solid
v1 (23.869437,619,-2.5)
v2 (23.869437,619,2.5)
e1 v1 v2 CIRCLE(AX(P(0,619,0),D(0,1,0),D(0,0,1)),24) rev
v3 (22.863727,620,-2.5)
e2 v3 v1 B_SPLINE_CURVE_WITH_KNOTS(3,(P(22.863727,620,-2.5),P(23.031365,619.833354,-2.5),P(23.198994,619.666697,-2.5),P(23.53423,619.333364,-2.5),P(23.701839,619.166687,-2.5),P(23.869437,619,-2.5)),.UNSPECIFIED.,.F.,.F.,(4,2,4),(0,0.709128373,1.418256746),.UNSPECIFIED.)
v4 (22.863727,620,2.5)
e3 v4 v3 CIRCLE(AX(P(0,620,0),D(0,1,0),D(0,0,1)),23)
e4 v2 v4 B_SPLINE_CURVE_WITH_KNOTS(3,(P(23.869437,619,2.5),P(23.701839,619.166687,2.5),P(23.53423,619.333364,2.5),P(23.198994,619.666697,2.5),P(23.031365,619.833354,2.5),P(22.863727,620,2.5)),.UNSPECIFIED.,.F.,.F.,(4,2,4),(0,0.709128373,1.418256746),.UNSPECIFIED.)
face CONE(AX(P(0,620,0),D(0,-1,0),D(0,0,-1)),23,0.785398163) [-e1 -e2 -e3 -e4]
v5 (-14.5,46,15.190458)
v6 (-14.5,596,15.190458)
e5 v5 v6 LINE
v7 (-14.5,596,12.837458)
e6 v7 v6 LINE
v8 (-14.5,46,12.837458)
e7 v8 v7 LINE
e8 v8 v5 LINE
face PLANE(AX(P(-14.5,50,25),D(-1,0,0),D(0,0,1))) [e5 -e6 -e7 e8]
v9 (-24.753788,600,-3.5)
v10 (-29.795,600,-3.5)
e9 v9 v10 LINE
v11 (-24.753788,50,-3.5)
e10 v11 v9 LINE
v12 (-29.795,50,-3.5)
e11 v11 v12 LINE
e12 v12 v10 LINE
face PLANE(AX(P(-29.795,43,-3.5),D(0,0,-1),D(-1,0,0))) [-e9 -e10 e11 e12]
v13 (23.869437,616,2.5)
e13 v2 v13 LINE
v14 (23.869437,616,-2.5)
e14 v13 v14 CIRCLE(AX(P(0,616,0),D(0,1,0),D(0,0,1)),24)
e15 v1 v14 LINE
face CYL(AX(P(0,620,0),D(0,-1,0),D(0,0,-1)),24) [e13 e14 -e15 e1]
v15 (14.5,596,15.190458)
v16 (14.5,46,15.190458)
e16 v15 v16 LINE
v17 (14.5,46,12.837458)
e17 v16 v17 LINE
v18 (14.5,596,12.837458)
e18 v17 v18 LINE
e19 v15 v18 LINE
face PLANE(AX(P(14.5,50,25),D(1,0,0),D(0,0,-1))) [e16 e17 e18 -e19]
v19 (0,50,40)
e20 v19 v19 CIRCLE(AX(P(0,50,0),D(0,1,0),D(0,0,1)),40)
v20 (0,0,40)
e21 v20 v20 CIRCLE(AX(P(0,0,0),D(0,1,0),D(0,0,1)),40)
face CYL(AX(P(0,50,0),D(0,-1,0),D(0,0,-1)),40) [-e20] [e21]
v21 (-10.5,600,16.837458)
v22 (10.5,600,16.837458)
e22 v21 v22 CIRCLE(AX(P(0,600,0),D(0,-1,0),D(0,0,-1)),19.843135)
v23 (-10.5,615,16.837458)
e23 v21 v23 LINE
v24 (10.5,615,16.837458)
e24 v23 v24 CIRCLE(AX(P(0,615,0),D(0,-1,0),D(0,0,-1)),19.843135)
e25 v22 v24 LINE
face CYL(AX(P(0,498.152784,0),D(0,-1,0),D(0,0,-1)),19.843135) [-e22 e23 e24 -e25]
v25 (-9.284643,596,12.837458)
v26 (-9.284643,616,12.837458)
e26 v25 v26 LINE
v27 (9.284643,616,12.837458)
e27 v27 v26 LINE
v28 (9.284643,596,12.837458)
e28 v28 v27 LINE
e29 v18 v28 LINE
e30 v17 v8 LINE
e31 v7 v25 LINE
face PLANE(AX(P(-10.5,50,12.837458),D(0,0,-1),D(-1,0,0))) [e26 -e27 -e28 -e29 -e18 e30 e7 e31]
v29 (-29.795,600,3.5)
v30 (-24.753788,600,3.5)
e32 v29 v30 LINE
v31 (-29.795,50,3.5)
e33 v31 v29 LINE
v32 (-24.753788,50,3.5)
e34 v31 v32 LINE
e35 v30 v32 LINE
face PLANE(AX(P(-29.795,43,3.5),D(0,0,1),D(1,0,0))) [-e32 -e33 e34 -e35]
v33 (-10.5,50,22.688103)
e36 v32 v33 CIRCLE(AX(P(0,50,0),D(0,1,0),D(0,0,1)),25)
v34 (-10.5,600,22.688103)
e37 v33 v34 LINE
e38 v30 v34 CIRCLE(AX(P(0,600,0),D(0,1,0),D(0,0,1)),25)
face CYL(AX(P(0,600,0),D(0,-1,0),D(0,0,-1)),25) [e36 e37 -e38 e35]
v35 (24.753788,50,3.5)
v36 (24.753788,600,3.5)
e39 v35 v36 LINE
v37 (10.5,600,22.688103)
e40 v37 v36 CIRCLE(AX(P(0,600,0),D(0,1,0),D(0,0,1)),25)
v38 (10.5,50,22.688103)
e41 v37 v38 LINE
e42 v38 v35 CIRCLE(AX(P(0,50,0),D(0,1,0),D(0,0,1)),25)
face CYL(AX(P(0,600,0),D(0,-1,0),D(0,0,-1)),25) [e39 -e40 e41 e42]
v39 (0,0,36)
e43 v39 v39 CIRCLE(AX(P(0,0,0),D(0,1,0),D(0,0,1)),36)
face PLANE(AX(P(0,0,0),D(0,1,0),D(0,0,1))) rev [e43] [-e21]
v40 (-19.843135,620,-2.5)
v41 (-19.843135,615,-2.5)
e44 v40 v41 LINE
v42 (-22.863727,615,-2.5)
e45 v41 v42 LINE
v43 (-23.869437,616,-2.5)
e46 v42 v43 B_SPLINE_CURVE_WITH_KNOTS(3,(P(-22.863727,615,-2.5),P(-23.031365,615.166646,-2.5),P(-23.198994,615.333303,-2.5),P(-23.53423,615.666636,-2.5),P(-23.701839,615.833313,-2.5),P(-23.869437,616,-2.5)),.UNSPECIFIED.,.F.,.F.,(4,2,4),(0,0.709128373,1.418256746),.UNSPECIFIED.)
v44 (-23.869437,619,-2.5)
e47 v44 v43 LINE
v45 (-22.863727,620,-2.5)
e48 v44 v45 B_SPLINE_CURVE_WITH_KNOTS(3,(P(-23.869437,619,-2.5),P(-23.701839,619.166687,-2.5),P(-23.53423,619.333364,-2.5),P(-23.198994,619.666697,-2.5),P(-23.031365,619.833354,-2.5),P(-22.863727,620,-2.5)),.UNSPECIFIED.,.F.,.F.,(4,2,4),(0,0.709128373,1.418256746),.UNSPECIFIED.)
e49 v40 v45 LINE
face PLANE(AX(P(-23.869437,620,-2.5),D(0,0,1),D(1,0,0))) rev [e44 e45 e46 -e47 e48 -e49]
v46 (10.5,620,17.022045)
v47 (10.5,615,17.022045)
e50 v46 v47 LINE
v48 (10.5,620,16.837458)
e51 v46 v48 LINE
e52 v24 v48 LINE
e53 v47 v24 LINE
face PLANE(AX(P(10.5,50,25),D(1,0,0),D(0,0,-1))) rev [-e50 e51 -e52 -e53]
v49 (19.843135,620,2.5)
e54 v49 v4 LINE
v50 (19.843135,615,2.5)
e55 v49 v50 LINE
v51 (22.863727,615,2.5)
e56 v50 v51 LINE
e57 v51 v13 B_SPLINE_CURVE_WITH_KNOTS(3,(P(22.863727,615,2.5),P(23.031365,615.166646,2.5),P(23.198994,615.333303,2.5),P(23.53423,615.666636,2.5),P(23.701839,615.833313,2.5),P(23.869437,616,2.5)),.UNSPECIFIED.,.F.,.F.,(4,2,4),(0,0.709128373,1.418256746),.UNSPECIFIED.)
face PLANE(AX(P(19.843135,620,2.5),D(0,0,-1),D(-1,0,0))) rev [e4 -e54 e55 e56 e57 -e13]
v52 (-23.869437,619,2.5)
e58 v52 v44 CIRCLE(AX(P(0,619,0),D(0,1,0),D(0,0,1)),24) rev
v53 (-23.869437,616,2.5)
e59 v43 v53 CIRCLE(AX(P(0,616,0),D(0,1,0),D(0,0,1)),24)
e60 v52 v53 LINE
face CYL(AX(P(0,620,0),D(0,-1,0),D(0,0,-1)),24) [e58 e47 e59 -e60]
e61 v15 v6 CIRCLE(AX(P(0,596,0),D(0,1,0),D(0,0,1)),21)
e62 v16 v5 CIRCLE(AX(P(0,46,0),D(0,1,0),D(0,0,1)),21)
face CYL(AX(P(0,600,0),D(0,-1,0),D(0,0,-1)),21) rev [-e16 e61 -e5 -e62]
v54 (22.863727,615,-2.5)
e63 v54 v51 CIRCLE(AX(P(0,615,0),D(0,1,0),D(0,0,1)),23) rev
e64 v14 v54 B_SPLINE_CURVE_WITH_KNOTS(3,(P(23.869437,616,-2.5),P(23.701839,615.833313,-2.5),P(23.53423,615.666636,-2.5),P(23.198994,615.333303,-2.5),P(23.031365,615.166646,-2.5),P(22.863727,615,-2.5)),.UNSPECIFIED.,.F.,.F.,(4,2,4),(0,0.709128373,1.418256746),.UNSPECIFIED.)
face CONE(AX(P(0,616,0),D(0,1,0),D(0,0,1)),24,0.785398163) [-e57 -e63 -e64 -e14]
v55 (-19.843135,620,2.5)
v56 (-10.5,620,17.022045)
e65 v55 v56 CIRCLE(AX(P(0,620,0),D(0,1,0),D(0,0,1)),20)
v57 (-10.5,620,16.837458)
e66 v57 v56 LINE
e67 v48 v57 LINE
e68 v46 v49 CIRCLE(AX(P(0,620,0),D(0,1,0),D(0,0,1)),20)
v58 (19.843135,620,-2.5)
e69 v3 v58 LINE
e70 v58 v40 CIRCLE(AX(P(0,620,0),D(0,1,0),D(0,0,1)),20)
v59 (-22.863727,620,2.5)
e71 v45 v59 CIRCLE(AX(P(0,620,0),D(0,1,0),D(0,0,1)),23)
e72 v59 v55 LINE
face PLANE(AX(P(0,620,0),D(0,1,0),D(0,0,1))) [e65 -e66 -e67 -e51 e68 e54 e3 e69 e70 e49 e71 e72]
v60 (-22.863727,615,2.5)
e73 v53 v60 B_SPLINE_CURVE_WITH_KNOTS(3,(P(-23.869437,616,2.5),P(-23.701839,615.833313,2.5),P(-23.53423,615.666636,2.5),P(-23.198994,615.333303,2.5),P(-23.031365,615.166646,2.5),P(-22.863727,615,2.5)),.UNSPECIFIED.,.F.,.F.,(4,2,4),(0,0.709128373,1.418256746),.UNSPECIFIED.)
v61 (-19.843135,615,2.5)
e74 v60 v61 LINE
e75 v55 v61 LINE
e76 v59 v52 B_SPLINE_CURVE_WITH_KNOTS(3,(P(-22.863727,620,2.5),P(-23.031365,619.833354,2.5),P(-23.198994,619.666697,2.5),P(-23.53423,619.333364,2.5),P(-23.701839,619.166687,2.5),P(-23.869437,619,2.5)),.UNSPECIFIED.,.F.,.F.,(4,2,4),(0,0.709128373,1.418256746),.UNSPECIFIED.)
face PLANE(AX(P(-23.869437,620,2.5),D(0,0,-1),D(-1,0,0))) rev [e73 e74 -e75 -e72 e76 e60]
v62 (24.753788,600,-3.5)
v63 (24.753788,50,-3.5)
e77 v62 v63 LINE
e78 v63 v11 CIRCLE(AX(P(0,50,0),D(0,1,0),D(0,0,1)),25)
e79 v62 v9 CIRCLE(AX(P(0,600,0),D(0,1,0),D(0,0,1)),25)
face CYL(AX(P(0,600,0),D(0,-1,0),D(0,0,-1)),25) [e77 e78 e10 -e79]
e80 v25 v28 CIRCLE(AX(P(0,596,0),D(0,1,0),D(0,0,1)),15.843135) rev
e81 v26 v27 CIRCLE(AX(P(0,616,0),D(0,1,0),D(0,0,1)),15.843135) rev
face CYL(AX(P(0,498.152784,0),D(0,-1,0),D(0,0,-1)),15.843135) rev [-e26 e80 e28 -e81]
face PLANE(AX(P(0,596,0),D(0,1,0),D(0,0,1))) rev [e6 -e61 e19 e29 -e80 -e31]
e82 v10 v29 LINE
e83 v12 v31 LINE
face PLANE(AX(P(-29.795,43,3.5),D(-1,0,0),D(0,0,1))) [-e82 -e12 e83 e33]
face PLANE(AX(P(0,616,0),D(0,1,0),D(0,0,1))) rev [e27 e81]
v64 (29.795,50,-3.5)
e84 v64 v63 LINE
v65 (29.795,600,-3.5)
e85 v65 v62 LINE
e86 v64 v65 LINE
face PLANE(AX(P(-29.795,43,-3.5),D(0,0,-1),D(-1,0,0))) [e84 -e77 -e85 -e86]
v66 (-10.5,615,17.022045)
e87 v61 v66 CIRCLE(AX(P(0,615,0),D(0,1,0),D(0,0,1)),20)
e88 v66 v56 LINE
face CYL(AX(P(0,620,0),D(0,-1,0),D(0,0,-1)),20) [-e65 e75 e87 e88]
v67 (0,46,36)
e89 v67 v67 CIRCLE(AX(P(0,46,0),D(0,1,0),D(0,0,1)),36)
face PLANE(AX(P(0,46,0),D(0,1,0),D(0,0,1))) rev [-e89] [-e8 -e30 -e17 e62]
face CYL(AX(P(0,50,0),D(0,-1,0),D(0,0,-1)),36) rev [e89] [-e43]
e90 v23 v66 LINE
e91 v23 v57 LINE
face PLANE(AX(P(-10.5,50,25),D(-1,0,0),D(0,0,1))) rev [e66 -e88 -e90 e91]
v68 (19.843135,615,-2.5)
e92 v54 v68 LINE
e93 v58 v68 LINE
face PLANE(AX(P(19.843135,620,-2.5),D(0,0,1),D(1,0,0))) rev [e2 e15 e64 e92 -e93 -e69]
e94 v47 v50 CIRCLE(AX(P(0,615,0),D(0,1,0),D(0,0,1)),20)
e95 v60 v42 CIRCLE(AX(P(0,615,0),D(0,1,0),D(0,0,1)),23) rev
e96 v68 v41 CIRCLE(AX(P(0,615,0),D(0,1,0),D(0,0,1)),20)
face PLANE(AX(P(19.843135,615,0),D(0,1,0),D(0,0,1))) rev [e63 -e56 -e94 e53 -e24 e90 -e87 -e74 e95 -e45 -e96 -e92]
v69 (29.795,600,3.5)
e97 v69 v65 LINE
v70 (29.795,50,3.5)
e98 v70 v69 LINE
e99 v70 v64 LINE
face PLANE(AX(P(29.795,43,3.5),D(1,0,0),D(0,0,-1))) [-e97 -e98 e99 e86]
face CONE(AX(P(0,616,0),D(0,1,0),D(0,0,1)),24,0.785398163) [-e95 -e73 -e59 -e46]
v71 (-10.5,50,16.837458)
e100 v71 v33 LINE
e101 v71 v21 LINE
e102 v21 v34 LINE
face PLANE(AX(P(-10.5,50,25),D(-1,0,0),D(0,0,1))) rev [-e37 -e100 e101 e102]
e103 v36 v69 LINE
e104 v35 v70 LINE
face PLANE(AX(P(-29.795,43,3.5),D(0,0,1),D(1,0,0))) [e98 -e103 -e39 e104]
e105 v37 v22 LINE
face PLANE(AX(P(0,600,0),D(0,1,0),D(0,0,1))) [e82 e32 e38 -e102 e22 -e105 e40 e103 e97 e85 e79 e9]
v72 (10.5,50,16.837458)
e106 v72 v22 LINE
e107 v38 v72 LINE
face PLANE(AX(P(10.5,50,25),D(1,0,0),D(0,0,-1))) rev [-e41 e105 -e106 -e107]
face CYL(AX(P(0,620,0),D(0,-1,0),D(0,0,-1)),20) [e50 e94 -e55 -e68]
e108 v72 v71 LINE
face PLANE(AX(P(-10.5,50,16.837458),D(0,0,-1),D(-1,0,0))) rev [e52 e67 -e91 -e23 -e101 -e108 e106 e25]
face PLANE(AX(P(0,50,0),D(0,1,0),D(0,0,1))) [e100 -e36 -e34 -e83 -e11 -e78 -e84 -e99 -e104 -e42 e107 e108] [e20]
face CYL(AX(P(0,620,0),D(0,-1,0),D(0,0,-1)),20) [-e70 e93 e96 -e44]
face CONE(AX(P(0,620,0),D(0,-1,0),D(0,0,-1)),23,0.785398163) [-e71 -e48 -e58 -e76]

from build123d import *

# Parameters (mm, degrees)
SKETCH1_R           = 25
BOSS_EXTRUDE1_DEPTH = 600
SKETCH1_3_R         = 40
SKETCH1_3_R_2       = 25
BOSS_EXTRUDE2_DEPTH = 50
BOSS_EXTRUDE3_DEPTH = 20
SKETCH30_W          = 5.156865167
SKETCH30_H          = 15
CHAMFER1_SIZE       = 1
SKETCH31_W          = 59.59
SKETCH31_H          = 7
BOSS_EXTRUDE4_DEPTH = 557
SKETCH32_W          = 21
SKETCH32_H          = 8.16254176
CUT_EXTRUDE1_DEPTH  = 570
SHELL2_DEPTH        = 596
SHELL2_2_OUTLINE_R  = 36
SHELL2_2_DEPTH      = 46
SHELL2_START        = 596
SHELL2_3_DEPTH      = 20


# Read off the part's stored shape, not the designer's step: Shell2
with BuildPart() as part:
    # Sketch1 → Boss-Extrude1 (new body)
    with BuildSketch(Plane(origin=(0, 0, 0), x_dir=(1, 0, 0), z_dir=(0, 1, 0))):
        with Locations(Location((0, 0, 0), (0, 0, 270))):
            Circle(SKETCH1_R)
    extrude(amount=BOSS_EXTRUDE1_DEPTH)

    # Sketch1<3> → Boss-Extrude2 (add)
    with BuildSketch(Plane(origin=(0, 0, 0), x_dir=(1, 0, 0), z_dir=(0, 1, 0))):
        with Locations(Location((0, 0, 0), (0, 0, 270))):
            Circle(SKETCH1_3_R)
        with Locations(Location((0, 0, 0), (0, 0, 270))):
            Circle(SKETCH1_3_R_2, mode=Mode.SUBTRACT)
    extrude(amount=BOSS_EXTRUDE2_DEPTH)

    # Sketch2 → Boss-Extrude3 (add)
    with BuildSketch(Plane(origin=(0, 600, 0), x_dir=(1, 0, 0), z_dir=(0, 1, 0))):
        with BuildLine():
            Line((19.843134833, 2.5), (23.869436525, 2.5))
            ThreePointArc((23.869436525, 2.5), (24, 0), (23.869436525, -2.5))
            Line((23.869436525, -2.5), (19.843134833, -2.5))
            ThreePointArc((19.843134833, -2.5), (0, -20), (-19.843134833, -2.5))
            Line((-19.843134833, -2.5), (-23.869436525, -2.5))
            ThreePointArc((-23.869436525, -2.5), (-24, 0), (-23.869436525, 2.5))
            Line((-23.869436525, 2.5), (-19.843134833, 2.5))
            ThreePointArc((-19.843134833, 2.5), (0, 20), (19.843134833, 2.5))
        make_face()
    extrude(amount=BOSS_EXTRUDE3_DEPTH)

    # Sketch30 → Cut-Revolve1 (revolve, cut)
    with BuildSketch(Plane.XY, mode=Mode.PRIVATE) as cut_revolve1_sk:
        with Locations((22.421567417, 607.5)):
            Rectangle(SKETCH30_W, SKETCH30_H)
    revolve(cut_revolve1_sk.sketch.rotate(Axis((0, 498.152783653, 0), (0, 1, 0)), 90), axis=Axis((0, 498.152783653, 0), (0, 1, 0)), mode=Mode.SUBTRACT)

    # Chamfer1
    chamfer1_edges = [part.edges().sort_by_distance(p)[0] for p in [
        (-24, 620, 0),
        (24, 620, 0),
        (-24, 615, 0),
        (24, 615, 0),
    ]]
    chamfer(chamfer1_edges, length=CHAMFER1_SIZE)

    # Sketch31 → Boss-Extrude4 (add)
    with BuildSketch(Plane(origin=(0, 600, 0), x_dir=(1, 0, 0), z_dir=(0, 1, 0))):
        Rectangle(SKETCH31_W, SKETCH31_H)
    extrude(amount=-BOSS_EXTRUDE4_DEPTH)

    # Sketch32 → Cut-Extrude1 (cut)
    with BuildSketch(Plane(origin=(0, 620, 0), x_dir=(1, 0, 0), z_dir=(0, 1, 0))):
        with Locations((0, -20.91872912)):
            Rectangle(SKETCH32_W, SKETCH32_H)
    extrude(amount=-CUT_EXTRUDE1_DEPTH, mode=Mode.SUBTRACT)

    # Shell2 outline → Shell2 (cut)
    with BuildSketch(Plane(origin=(0, 0, 0), x_dir=(1, 0, 0), z_dir=(0, 1, 0))):
        with BuildLine():
            ThreePointArc((14.5, -15.190457531), (0, 21), (-14.5, -15.190457531))
            Line((-14.5, -15.190457531), (-14.5, -12.83745824))
            Line((-14.5, -12.83745824), (14.5, -12.83745824))
            Line((14.5, -12.83745824), (14.5, -15.190457531))
        make_face()
    extrude(amount=SHELL2_DEPTH, mode=Mode.SUBTRACT)

    # Shell2 2 outline → Shell2 2 (cut)
    with BuildSketch(Plane(origin=(0, 0, 0), x_dir=(1, 0, 0), z_dir=(0, 1, 0))):
        Circle(SHELL2_2_OUTLINE_R)
        with BuildLine():
            Line((-14.5, -12.83745824), (-14.5, -15.190457531))
            ThreePointArc((-14.5, -15.190457531), (0, 21), (14.5, -15.190457531))
            Line((14.5, -15.190457531), (14.5, -12.83745824))
            Line((14.5, -12.83745824), (-14.5, -12.83745824))
        make_face(mode=Mode.SUBTRACT)
    extrude(amount=SHELL2_2_DEPTH, mode=Mode.SUBTRACT)

    # Shell2 3 outline → Shell2 3 (cut)
    with BuildSketch(Plane(origin=(0, 0, 0), x_dir=(1, 0, 0), z_dir=(0, 1, 0)).offset(SHELL2_START)):
        with BuildLine():
            ThreePointArc((9.284642549, -12.83745824), (0, 15.843134833), (-9.284642549, -12.83745824))
            Line((-9.284642549, -12.83745824), (9.284642549, -12.83745824))
        make_face()
    extrude(amount=SHELL2_3_DEPTH, mode=Mode.SUBTRACT)


solid = part.part
